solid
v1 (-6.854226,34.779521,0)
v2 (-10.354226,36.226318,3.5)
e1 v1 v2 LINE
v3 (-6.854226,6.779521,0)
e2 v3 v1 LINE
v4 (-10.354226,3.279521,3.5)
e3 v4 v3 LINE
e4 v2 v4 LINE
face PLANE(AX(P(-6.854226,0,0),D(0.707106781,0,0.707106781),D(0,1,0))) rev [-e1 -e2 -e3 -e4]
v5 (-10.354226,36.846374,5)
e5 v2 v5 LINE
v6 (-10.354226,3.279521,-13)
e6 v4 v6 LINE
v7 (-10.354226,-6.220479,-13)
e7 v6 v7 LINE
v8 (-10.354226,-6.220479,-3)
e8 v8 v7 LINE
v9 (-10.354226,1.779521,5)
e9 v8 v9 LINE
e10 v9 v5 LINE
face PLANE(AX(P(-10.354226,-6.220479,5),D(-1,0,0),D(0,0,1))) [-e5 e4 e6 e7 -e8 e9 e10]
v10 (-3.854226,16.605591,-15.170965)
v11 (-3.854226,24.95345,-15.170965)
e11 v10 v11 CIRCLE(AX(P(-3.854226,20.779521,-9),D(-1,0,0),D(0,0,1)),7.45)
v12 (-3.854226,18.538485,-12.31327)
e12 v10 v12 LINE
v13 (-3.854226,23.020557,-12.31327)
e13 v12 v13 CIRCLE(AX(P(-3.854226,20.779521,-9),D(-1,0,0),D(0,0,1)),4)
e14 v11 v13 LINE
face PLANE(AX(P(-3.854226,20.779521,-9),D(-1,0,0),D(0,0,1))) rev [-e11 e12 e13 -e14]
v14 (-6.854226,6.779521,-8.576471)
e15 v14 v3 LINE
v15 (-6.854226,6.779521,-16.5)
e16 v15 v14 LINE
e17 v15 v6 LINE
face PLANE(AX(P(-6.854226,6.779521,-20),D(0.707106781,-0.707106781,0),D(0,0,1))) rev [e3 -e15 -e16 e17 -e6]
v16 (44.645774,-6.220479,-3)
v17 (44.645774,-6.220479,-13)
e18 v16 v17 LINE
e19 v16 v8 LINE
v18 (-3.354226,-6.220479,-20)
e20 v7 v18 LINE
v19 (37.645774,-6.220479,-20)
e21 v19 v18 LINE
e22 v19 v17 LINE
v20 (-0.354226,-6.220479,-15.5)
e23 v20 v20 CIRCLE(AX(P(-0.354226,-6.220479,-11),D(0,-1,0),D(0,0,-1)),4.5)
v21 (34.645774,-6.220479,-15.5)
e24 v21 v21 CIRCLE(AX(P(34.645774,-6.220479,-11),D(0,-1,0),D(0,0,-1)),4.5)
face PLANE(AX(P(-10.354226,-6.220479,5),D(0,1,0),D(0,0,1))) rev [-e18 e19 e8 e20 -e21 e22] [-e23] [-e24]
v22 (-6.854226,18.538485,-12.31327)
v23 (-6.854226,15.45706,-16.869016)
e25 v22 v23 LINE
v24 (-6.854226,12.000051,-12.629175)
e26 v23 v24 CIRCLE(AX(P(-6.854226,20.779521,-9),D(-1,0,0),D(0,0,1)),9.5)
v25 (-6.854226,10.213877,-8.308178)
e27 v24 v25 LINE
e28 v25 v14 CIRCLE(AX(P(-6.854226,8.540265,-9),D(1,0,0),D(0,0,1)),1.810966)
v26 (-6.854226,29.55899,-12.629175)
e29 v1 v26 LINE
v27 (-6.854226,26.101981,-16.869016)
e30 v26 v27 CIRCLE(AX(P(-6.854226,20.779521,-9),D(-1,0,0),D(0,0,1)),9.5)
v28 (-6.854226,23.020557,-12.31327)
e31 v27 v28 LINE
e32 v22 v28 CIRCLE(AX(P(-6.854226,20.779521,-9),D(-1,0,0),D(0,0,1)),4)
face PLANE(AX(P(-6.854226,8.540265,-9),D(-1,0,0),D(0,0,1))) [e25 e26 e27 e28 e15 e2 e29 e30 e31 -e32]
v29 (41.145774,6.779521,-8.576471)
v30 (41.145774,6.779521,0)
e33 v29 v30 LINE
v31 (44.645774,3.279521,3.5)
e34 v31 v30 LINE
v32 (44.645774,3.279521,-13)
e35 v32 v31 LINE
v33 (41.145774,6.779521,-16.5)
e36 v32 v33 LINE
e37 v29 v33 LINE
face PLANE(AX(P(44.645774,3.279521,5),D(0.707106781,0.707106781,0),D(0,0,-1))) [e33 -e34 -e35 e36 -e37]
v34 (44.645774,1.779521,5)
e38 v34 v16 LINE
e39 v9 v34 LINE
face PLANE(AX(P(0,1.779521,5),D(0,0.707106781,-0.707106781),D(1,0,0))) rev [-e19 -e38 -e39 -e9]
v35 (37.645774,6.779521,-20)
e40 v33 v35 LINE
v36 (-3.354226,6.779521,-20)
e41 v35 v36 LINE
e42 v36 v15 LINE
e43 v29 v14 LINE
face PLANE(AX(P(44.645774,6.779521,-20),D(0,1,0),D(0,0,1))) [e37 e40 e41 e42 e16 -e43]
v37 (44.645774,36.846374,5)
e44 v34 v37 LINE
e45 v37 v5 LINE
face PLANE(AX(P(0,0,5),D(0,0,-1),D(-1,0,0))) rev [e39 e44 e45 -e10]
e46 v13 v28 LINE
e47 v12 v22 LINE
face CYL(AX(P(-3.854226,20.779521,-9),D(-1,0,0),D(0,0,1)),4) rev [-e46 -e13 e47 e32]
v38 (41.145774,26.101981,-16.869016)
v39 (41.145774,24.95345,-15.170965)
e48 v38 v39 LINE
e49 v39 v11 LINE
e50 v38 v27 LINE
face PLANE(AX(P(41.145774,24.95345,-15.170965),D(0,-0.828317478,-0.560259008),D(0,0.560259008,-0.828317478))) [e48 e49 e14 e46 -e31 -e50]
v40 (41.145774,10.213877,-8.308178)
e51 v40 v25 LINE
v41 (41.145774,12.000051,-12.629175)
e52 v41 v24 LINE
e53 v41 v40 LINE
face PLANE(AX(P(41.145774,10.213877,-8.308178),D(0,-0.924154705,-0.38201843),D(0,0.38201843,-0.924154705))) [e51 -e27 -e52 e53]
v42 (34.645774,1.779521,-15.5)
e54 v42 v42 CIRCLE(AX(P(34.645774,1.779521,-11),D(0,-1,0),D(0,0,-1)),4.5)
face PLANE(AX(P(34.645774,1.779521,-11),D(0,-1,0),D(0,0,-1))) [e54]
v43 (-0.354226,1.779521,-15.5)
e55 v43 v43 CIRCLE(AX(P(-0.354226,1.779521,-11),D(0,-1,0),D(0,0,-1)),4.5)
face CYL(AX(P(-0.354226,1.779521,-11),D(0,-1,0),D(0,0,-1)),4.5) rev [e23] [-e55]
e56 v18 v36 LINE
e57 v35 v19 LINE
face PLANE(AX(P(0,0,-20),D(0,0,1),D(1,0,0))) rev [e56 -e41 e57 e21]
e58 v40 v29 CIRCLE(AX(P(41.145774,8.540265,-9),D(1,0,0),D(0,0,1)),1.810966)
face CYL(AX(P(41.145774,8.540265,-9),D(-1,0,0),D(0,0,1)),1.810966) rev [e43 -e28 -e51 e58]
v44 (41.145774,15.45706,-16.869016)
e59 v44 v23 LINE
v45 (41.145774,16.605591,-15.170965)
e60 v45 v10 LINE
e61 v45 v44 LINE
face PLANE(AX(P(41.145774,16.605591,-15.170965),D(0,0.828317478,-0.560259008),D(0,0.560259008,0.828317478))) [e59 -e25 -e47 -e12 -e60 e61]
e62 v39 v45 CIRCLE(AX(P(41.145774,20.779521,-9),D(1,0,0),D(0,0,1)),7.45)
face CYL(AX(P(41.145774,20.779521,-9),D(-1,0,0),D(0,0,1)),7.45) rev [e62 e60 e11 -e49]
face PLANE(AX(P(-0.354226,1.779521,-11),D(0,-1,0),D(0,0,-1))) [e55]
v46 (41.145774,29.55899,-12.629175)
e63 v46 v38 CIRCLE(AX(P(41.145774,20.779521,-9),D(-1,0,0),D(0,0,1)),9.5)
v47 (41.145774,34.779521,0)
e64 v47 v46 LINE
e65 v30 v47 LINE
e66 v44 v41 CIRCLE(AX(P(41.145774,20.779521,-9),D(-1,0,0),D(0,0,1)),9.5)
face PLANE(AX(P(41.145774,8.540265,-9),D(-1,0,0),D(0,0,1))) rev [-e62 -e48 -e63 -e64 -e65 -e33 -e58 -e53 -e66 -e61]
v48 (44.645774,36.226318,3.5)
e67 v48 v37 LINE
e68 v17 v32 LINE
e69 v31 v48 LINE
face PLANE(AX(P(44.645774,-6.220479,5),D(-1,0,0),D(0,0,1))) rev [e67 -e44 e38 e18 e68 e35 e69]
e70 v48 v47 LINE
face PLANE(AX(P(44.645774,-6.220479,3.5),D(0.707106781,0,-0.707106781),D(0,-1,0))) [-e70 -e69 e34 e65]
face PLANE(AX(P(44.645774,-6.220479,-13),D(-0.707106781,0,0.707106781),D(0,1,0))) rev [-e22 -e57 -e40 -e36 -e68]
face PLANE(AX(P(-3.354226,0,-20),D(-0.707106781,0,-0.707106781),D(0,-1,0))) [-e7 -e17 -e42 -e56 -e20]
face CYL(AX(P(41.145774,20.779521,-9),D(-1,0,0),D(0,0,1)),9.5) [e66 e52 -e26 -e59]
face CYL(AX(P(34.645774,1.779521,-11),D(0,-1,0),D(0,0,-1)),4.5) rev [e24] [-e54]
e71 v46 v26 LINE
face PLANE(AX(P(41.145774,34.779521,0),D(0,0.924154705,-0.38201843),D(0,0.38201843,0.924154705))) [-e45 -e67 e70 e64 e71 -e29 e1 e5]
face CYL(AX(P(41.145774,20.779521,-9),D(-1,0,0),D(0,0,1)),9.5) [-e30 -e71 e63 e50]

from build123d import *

# Parameters (mm, degrees)
SKETCH1_W           = 55
SKETCH1_H           = 45
BOSS_EXTRUDE1_DEPTH = 5
SKETCH3_W           = 55
SKETCH3_H           = 13
BOSS_EXTRUDE5_DEPTH = 20
CHAMFER1_SIZE       = 8
SKETCH5_R           = 4.5
CUT_EXTRUDE2_DEPTH  = 8
BOSS_EXTRUDE7_DEPTH = 48
CUT_EXTRUDE3_DEPTH  = 71.205777697
CHAMFER2_SIZE       = 3.5
CHAMFER3_SIZE       = 3.5
CHAMFER4_SIZE       = 7
BOSS_EXTRUDE8_DEPTH = 3


with BuildPart() as part:
    # Sketch1 → Boss-Extrude1 (new body)
    with BuildSketch(Plane.XY):
        with Locations((17.145774036, 16.279520652)):
            Rectangle(SKETCH1_W, SKETCH1_H)
    extrude(amount=BOSS_EXTRUDE1_DEPTH)

    # Sketch3 → Boss-Extrude5 (add)
    with BuildSketch(Plane(origin=(0, 0, 0), x_dir=(-1, 0, 0), z_dir=(0, 0, -1))):
        with Locations((-17.145774036, 0.279520652)):
            Rectangle(SKETCH3_W, SKETCH3_H)
    extrude(amount=BOSS_EXTRUDE5_DEPTH)

    # Chamfer1
    chamfer1_edges = [part.edges().sort_by_distance(p)[0] for p in [
        (17.145774036, -6.220479348, 5),
    ]]
    chamfer(chamfer1_edges, length=CHAMFER1_SIZE)

    # Sketch5 → Cut-Extrude2 (cut)
    with BuildSketch(Plane.XZ.offset(6.220479348)):
        with Locations(Location((-0.354225964, -11, 0), (0, 0, 270))):
            Circle(SKETCH5_R)
        with Locations(Location((34.645774036, -11, 0), (0, 0, 270))):
            Circle(SKETCH5_R)
    extrude(amount=-CUT_EXTRUDE2_DEPTH, mode=Mode.SUBTRACT)

    # Sketch7 → Boss-Extrude7 (add)
    with BuildSketch(Plane.ZY.offset(6.854225964)):
        with BuildLine():
            Line((-8.308177677, 10.21387745), (-12.629175087, 12.000050953))
            ThreePointArc((-12.629175087, 12.000050953), (-15.003318067, 13.416764905), (-16.86901604, 15.457060078))
            Line((-16.86901604, 15.457060078), (-15.17096521, 16.605591044))
            ThreePointArc((-15.17096521, 16.605591044), (-1.55, 20.779520652), (-15.17096521, 24.95345026))
            Line((-15.17096521, 24.95345026), (-16.86901604, 26.101981226))
            ThreePointArc((-16.86901604, 26.101981226), (-15.003318067, 28.142276398), (-12.629175087, 29.55899035))
            Line((-12.629175087, 29.55899035), (0, 34.779520652))
            Line((0, 34.779520652), (0, 6.779520652))
            Line((0, 6.779520652), (-8.576470695, 6.779520652))
            ThreePointArc((-8.576470695, 6.779520652), (-7.194534972, 8.39922137), (-8.308177677, 10.21387745))
        make_face()
    extrude(amount=-BOSS_EXTRUDE7_DEPTH)

    # Sketch8 → Cut-Extrude3 (cut, through all)
    with BuildSketch(Plane.ZY.offset(10.354225964)):
        Polygon((0, 34.779520652), (5, 36.846373896), (5, 38.779520652), (0, 38.779520652), align=None)
    extrude(amount=-CUT_EXTRUDE3_DEPTH, mode=Mode.SUBTRACT)

    # Chamfer2
    chamfer2_edges = [part.edges().sort_by_distance(p)[0] for p in [
        (-10.354225964, 6.779520652, -10),
        (-10.354225964, 20.779520652, 0),
    ]]
    chamfer(chamfer2_edges, length=CHAMFER2_SIZE - 0.0001)  # a hair under: the kernel refuses the full size

    # Chamfer3
    chamfer3_edges = [part.edges().sort_by_distance(p)[0] for p in [
        (44.645774036, 20.779520652, 0),
        (44.645774036, 6.779520652, -10),
    ]]
    chamfer(chamfer3_edges, length=CHAMFER3_SIZE - 0.0001)  # a hair under: the kernel refuses the full size

    # Chamfer4
    chamfer4_edges = [part.edges().sort_by_distance(p)[0] for p in [
        (44.645774036, -1.470429348, -20),
        (-10.354225964, -1.470429348, -20),
    ]]
    chamfer(chamfer4_edges, length=CHAMFER4_SIZE)

    # Sketch9 → Boss-Extrude8 (add)
    with BuildSketch(Plane.ZY.offset(6.854225964)):
        with BuildLine():
            Line((-15.17096521, 24.95345026), (-12.313269912, 23.020556683))
            ThreePointArc((-12.313269912, 23.020556683), (-5, 20.779520652), (-12.313269912, 18.538484621))
            Line((-12.313269912, 18.538484621), (-15.17096521, 16.605591044))
            ThreePointArc((-15.17096521, 16.605591044), (-1.55, 20.779520652), (-15.17096521, 24.95345026))
        make_face()
    extrude(amount=-BOSS_EXTRUDE8_DEPTH)


solid = part.part
